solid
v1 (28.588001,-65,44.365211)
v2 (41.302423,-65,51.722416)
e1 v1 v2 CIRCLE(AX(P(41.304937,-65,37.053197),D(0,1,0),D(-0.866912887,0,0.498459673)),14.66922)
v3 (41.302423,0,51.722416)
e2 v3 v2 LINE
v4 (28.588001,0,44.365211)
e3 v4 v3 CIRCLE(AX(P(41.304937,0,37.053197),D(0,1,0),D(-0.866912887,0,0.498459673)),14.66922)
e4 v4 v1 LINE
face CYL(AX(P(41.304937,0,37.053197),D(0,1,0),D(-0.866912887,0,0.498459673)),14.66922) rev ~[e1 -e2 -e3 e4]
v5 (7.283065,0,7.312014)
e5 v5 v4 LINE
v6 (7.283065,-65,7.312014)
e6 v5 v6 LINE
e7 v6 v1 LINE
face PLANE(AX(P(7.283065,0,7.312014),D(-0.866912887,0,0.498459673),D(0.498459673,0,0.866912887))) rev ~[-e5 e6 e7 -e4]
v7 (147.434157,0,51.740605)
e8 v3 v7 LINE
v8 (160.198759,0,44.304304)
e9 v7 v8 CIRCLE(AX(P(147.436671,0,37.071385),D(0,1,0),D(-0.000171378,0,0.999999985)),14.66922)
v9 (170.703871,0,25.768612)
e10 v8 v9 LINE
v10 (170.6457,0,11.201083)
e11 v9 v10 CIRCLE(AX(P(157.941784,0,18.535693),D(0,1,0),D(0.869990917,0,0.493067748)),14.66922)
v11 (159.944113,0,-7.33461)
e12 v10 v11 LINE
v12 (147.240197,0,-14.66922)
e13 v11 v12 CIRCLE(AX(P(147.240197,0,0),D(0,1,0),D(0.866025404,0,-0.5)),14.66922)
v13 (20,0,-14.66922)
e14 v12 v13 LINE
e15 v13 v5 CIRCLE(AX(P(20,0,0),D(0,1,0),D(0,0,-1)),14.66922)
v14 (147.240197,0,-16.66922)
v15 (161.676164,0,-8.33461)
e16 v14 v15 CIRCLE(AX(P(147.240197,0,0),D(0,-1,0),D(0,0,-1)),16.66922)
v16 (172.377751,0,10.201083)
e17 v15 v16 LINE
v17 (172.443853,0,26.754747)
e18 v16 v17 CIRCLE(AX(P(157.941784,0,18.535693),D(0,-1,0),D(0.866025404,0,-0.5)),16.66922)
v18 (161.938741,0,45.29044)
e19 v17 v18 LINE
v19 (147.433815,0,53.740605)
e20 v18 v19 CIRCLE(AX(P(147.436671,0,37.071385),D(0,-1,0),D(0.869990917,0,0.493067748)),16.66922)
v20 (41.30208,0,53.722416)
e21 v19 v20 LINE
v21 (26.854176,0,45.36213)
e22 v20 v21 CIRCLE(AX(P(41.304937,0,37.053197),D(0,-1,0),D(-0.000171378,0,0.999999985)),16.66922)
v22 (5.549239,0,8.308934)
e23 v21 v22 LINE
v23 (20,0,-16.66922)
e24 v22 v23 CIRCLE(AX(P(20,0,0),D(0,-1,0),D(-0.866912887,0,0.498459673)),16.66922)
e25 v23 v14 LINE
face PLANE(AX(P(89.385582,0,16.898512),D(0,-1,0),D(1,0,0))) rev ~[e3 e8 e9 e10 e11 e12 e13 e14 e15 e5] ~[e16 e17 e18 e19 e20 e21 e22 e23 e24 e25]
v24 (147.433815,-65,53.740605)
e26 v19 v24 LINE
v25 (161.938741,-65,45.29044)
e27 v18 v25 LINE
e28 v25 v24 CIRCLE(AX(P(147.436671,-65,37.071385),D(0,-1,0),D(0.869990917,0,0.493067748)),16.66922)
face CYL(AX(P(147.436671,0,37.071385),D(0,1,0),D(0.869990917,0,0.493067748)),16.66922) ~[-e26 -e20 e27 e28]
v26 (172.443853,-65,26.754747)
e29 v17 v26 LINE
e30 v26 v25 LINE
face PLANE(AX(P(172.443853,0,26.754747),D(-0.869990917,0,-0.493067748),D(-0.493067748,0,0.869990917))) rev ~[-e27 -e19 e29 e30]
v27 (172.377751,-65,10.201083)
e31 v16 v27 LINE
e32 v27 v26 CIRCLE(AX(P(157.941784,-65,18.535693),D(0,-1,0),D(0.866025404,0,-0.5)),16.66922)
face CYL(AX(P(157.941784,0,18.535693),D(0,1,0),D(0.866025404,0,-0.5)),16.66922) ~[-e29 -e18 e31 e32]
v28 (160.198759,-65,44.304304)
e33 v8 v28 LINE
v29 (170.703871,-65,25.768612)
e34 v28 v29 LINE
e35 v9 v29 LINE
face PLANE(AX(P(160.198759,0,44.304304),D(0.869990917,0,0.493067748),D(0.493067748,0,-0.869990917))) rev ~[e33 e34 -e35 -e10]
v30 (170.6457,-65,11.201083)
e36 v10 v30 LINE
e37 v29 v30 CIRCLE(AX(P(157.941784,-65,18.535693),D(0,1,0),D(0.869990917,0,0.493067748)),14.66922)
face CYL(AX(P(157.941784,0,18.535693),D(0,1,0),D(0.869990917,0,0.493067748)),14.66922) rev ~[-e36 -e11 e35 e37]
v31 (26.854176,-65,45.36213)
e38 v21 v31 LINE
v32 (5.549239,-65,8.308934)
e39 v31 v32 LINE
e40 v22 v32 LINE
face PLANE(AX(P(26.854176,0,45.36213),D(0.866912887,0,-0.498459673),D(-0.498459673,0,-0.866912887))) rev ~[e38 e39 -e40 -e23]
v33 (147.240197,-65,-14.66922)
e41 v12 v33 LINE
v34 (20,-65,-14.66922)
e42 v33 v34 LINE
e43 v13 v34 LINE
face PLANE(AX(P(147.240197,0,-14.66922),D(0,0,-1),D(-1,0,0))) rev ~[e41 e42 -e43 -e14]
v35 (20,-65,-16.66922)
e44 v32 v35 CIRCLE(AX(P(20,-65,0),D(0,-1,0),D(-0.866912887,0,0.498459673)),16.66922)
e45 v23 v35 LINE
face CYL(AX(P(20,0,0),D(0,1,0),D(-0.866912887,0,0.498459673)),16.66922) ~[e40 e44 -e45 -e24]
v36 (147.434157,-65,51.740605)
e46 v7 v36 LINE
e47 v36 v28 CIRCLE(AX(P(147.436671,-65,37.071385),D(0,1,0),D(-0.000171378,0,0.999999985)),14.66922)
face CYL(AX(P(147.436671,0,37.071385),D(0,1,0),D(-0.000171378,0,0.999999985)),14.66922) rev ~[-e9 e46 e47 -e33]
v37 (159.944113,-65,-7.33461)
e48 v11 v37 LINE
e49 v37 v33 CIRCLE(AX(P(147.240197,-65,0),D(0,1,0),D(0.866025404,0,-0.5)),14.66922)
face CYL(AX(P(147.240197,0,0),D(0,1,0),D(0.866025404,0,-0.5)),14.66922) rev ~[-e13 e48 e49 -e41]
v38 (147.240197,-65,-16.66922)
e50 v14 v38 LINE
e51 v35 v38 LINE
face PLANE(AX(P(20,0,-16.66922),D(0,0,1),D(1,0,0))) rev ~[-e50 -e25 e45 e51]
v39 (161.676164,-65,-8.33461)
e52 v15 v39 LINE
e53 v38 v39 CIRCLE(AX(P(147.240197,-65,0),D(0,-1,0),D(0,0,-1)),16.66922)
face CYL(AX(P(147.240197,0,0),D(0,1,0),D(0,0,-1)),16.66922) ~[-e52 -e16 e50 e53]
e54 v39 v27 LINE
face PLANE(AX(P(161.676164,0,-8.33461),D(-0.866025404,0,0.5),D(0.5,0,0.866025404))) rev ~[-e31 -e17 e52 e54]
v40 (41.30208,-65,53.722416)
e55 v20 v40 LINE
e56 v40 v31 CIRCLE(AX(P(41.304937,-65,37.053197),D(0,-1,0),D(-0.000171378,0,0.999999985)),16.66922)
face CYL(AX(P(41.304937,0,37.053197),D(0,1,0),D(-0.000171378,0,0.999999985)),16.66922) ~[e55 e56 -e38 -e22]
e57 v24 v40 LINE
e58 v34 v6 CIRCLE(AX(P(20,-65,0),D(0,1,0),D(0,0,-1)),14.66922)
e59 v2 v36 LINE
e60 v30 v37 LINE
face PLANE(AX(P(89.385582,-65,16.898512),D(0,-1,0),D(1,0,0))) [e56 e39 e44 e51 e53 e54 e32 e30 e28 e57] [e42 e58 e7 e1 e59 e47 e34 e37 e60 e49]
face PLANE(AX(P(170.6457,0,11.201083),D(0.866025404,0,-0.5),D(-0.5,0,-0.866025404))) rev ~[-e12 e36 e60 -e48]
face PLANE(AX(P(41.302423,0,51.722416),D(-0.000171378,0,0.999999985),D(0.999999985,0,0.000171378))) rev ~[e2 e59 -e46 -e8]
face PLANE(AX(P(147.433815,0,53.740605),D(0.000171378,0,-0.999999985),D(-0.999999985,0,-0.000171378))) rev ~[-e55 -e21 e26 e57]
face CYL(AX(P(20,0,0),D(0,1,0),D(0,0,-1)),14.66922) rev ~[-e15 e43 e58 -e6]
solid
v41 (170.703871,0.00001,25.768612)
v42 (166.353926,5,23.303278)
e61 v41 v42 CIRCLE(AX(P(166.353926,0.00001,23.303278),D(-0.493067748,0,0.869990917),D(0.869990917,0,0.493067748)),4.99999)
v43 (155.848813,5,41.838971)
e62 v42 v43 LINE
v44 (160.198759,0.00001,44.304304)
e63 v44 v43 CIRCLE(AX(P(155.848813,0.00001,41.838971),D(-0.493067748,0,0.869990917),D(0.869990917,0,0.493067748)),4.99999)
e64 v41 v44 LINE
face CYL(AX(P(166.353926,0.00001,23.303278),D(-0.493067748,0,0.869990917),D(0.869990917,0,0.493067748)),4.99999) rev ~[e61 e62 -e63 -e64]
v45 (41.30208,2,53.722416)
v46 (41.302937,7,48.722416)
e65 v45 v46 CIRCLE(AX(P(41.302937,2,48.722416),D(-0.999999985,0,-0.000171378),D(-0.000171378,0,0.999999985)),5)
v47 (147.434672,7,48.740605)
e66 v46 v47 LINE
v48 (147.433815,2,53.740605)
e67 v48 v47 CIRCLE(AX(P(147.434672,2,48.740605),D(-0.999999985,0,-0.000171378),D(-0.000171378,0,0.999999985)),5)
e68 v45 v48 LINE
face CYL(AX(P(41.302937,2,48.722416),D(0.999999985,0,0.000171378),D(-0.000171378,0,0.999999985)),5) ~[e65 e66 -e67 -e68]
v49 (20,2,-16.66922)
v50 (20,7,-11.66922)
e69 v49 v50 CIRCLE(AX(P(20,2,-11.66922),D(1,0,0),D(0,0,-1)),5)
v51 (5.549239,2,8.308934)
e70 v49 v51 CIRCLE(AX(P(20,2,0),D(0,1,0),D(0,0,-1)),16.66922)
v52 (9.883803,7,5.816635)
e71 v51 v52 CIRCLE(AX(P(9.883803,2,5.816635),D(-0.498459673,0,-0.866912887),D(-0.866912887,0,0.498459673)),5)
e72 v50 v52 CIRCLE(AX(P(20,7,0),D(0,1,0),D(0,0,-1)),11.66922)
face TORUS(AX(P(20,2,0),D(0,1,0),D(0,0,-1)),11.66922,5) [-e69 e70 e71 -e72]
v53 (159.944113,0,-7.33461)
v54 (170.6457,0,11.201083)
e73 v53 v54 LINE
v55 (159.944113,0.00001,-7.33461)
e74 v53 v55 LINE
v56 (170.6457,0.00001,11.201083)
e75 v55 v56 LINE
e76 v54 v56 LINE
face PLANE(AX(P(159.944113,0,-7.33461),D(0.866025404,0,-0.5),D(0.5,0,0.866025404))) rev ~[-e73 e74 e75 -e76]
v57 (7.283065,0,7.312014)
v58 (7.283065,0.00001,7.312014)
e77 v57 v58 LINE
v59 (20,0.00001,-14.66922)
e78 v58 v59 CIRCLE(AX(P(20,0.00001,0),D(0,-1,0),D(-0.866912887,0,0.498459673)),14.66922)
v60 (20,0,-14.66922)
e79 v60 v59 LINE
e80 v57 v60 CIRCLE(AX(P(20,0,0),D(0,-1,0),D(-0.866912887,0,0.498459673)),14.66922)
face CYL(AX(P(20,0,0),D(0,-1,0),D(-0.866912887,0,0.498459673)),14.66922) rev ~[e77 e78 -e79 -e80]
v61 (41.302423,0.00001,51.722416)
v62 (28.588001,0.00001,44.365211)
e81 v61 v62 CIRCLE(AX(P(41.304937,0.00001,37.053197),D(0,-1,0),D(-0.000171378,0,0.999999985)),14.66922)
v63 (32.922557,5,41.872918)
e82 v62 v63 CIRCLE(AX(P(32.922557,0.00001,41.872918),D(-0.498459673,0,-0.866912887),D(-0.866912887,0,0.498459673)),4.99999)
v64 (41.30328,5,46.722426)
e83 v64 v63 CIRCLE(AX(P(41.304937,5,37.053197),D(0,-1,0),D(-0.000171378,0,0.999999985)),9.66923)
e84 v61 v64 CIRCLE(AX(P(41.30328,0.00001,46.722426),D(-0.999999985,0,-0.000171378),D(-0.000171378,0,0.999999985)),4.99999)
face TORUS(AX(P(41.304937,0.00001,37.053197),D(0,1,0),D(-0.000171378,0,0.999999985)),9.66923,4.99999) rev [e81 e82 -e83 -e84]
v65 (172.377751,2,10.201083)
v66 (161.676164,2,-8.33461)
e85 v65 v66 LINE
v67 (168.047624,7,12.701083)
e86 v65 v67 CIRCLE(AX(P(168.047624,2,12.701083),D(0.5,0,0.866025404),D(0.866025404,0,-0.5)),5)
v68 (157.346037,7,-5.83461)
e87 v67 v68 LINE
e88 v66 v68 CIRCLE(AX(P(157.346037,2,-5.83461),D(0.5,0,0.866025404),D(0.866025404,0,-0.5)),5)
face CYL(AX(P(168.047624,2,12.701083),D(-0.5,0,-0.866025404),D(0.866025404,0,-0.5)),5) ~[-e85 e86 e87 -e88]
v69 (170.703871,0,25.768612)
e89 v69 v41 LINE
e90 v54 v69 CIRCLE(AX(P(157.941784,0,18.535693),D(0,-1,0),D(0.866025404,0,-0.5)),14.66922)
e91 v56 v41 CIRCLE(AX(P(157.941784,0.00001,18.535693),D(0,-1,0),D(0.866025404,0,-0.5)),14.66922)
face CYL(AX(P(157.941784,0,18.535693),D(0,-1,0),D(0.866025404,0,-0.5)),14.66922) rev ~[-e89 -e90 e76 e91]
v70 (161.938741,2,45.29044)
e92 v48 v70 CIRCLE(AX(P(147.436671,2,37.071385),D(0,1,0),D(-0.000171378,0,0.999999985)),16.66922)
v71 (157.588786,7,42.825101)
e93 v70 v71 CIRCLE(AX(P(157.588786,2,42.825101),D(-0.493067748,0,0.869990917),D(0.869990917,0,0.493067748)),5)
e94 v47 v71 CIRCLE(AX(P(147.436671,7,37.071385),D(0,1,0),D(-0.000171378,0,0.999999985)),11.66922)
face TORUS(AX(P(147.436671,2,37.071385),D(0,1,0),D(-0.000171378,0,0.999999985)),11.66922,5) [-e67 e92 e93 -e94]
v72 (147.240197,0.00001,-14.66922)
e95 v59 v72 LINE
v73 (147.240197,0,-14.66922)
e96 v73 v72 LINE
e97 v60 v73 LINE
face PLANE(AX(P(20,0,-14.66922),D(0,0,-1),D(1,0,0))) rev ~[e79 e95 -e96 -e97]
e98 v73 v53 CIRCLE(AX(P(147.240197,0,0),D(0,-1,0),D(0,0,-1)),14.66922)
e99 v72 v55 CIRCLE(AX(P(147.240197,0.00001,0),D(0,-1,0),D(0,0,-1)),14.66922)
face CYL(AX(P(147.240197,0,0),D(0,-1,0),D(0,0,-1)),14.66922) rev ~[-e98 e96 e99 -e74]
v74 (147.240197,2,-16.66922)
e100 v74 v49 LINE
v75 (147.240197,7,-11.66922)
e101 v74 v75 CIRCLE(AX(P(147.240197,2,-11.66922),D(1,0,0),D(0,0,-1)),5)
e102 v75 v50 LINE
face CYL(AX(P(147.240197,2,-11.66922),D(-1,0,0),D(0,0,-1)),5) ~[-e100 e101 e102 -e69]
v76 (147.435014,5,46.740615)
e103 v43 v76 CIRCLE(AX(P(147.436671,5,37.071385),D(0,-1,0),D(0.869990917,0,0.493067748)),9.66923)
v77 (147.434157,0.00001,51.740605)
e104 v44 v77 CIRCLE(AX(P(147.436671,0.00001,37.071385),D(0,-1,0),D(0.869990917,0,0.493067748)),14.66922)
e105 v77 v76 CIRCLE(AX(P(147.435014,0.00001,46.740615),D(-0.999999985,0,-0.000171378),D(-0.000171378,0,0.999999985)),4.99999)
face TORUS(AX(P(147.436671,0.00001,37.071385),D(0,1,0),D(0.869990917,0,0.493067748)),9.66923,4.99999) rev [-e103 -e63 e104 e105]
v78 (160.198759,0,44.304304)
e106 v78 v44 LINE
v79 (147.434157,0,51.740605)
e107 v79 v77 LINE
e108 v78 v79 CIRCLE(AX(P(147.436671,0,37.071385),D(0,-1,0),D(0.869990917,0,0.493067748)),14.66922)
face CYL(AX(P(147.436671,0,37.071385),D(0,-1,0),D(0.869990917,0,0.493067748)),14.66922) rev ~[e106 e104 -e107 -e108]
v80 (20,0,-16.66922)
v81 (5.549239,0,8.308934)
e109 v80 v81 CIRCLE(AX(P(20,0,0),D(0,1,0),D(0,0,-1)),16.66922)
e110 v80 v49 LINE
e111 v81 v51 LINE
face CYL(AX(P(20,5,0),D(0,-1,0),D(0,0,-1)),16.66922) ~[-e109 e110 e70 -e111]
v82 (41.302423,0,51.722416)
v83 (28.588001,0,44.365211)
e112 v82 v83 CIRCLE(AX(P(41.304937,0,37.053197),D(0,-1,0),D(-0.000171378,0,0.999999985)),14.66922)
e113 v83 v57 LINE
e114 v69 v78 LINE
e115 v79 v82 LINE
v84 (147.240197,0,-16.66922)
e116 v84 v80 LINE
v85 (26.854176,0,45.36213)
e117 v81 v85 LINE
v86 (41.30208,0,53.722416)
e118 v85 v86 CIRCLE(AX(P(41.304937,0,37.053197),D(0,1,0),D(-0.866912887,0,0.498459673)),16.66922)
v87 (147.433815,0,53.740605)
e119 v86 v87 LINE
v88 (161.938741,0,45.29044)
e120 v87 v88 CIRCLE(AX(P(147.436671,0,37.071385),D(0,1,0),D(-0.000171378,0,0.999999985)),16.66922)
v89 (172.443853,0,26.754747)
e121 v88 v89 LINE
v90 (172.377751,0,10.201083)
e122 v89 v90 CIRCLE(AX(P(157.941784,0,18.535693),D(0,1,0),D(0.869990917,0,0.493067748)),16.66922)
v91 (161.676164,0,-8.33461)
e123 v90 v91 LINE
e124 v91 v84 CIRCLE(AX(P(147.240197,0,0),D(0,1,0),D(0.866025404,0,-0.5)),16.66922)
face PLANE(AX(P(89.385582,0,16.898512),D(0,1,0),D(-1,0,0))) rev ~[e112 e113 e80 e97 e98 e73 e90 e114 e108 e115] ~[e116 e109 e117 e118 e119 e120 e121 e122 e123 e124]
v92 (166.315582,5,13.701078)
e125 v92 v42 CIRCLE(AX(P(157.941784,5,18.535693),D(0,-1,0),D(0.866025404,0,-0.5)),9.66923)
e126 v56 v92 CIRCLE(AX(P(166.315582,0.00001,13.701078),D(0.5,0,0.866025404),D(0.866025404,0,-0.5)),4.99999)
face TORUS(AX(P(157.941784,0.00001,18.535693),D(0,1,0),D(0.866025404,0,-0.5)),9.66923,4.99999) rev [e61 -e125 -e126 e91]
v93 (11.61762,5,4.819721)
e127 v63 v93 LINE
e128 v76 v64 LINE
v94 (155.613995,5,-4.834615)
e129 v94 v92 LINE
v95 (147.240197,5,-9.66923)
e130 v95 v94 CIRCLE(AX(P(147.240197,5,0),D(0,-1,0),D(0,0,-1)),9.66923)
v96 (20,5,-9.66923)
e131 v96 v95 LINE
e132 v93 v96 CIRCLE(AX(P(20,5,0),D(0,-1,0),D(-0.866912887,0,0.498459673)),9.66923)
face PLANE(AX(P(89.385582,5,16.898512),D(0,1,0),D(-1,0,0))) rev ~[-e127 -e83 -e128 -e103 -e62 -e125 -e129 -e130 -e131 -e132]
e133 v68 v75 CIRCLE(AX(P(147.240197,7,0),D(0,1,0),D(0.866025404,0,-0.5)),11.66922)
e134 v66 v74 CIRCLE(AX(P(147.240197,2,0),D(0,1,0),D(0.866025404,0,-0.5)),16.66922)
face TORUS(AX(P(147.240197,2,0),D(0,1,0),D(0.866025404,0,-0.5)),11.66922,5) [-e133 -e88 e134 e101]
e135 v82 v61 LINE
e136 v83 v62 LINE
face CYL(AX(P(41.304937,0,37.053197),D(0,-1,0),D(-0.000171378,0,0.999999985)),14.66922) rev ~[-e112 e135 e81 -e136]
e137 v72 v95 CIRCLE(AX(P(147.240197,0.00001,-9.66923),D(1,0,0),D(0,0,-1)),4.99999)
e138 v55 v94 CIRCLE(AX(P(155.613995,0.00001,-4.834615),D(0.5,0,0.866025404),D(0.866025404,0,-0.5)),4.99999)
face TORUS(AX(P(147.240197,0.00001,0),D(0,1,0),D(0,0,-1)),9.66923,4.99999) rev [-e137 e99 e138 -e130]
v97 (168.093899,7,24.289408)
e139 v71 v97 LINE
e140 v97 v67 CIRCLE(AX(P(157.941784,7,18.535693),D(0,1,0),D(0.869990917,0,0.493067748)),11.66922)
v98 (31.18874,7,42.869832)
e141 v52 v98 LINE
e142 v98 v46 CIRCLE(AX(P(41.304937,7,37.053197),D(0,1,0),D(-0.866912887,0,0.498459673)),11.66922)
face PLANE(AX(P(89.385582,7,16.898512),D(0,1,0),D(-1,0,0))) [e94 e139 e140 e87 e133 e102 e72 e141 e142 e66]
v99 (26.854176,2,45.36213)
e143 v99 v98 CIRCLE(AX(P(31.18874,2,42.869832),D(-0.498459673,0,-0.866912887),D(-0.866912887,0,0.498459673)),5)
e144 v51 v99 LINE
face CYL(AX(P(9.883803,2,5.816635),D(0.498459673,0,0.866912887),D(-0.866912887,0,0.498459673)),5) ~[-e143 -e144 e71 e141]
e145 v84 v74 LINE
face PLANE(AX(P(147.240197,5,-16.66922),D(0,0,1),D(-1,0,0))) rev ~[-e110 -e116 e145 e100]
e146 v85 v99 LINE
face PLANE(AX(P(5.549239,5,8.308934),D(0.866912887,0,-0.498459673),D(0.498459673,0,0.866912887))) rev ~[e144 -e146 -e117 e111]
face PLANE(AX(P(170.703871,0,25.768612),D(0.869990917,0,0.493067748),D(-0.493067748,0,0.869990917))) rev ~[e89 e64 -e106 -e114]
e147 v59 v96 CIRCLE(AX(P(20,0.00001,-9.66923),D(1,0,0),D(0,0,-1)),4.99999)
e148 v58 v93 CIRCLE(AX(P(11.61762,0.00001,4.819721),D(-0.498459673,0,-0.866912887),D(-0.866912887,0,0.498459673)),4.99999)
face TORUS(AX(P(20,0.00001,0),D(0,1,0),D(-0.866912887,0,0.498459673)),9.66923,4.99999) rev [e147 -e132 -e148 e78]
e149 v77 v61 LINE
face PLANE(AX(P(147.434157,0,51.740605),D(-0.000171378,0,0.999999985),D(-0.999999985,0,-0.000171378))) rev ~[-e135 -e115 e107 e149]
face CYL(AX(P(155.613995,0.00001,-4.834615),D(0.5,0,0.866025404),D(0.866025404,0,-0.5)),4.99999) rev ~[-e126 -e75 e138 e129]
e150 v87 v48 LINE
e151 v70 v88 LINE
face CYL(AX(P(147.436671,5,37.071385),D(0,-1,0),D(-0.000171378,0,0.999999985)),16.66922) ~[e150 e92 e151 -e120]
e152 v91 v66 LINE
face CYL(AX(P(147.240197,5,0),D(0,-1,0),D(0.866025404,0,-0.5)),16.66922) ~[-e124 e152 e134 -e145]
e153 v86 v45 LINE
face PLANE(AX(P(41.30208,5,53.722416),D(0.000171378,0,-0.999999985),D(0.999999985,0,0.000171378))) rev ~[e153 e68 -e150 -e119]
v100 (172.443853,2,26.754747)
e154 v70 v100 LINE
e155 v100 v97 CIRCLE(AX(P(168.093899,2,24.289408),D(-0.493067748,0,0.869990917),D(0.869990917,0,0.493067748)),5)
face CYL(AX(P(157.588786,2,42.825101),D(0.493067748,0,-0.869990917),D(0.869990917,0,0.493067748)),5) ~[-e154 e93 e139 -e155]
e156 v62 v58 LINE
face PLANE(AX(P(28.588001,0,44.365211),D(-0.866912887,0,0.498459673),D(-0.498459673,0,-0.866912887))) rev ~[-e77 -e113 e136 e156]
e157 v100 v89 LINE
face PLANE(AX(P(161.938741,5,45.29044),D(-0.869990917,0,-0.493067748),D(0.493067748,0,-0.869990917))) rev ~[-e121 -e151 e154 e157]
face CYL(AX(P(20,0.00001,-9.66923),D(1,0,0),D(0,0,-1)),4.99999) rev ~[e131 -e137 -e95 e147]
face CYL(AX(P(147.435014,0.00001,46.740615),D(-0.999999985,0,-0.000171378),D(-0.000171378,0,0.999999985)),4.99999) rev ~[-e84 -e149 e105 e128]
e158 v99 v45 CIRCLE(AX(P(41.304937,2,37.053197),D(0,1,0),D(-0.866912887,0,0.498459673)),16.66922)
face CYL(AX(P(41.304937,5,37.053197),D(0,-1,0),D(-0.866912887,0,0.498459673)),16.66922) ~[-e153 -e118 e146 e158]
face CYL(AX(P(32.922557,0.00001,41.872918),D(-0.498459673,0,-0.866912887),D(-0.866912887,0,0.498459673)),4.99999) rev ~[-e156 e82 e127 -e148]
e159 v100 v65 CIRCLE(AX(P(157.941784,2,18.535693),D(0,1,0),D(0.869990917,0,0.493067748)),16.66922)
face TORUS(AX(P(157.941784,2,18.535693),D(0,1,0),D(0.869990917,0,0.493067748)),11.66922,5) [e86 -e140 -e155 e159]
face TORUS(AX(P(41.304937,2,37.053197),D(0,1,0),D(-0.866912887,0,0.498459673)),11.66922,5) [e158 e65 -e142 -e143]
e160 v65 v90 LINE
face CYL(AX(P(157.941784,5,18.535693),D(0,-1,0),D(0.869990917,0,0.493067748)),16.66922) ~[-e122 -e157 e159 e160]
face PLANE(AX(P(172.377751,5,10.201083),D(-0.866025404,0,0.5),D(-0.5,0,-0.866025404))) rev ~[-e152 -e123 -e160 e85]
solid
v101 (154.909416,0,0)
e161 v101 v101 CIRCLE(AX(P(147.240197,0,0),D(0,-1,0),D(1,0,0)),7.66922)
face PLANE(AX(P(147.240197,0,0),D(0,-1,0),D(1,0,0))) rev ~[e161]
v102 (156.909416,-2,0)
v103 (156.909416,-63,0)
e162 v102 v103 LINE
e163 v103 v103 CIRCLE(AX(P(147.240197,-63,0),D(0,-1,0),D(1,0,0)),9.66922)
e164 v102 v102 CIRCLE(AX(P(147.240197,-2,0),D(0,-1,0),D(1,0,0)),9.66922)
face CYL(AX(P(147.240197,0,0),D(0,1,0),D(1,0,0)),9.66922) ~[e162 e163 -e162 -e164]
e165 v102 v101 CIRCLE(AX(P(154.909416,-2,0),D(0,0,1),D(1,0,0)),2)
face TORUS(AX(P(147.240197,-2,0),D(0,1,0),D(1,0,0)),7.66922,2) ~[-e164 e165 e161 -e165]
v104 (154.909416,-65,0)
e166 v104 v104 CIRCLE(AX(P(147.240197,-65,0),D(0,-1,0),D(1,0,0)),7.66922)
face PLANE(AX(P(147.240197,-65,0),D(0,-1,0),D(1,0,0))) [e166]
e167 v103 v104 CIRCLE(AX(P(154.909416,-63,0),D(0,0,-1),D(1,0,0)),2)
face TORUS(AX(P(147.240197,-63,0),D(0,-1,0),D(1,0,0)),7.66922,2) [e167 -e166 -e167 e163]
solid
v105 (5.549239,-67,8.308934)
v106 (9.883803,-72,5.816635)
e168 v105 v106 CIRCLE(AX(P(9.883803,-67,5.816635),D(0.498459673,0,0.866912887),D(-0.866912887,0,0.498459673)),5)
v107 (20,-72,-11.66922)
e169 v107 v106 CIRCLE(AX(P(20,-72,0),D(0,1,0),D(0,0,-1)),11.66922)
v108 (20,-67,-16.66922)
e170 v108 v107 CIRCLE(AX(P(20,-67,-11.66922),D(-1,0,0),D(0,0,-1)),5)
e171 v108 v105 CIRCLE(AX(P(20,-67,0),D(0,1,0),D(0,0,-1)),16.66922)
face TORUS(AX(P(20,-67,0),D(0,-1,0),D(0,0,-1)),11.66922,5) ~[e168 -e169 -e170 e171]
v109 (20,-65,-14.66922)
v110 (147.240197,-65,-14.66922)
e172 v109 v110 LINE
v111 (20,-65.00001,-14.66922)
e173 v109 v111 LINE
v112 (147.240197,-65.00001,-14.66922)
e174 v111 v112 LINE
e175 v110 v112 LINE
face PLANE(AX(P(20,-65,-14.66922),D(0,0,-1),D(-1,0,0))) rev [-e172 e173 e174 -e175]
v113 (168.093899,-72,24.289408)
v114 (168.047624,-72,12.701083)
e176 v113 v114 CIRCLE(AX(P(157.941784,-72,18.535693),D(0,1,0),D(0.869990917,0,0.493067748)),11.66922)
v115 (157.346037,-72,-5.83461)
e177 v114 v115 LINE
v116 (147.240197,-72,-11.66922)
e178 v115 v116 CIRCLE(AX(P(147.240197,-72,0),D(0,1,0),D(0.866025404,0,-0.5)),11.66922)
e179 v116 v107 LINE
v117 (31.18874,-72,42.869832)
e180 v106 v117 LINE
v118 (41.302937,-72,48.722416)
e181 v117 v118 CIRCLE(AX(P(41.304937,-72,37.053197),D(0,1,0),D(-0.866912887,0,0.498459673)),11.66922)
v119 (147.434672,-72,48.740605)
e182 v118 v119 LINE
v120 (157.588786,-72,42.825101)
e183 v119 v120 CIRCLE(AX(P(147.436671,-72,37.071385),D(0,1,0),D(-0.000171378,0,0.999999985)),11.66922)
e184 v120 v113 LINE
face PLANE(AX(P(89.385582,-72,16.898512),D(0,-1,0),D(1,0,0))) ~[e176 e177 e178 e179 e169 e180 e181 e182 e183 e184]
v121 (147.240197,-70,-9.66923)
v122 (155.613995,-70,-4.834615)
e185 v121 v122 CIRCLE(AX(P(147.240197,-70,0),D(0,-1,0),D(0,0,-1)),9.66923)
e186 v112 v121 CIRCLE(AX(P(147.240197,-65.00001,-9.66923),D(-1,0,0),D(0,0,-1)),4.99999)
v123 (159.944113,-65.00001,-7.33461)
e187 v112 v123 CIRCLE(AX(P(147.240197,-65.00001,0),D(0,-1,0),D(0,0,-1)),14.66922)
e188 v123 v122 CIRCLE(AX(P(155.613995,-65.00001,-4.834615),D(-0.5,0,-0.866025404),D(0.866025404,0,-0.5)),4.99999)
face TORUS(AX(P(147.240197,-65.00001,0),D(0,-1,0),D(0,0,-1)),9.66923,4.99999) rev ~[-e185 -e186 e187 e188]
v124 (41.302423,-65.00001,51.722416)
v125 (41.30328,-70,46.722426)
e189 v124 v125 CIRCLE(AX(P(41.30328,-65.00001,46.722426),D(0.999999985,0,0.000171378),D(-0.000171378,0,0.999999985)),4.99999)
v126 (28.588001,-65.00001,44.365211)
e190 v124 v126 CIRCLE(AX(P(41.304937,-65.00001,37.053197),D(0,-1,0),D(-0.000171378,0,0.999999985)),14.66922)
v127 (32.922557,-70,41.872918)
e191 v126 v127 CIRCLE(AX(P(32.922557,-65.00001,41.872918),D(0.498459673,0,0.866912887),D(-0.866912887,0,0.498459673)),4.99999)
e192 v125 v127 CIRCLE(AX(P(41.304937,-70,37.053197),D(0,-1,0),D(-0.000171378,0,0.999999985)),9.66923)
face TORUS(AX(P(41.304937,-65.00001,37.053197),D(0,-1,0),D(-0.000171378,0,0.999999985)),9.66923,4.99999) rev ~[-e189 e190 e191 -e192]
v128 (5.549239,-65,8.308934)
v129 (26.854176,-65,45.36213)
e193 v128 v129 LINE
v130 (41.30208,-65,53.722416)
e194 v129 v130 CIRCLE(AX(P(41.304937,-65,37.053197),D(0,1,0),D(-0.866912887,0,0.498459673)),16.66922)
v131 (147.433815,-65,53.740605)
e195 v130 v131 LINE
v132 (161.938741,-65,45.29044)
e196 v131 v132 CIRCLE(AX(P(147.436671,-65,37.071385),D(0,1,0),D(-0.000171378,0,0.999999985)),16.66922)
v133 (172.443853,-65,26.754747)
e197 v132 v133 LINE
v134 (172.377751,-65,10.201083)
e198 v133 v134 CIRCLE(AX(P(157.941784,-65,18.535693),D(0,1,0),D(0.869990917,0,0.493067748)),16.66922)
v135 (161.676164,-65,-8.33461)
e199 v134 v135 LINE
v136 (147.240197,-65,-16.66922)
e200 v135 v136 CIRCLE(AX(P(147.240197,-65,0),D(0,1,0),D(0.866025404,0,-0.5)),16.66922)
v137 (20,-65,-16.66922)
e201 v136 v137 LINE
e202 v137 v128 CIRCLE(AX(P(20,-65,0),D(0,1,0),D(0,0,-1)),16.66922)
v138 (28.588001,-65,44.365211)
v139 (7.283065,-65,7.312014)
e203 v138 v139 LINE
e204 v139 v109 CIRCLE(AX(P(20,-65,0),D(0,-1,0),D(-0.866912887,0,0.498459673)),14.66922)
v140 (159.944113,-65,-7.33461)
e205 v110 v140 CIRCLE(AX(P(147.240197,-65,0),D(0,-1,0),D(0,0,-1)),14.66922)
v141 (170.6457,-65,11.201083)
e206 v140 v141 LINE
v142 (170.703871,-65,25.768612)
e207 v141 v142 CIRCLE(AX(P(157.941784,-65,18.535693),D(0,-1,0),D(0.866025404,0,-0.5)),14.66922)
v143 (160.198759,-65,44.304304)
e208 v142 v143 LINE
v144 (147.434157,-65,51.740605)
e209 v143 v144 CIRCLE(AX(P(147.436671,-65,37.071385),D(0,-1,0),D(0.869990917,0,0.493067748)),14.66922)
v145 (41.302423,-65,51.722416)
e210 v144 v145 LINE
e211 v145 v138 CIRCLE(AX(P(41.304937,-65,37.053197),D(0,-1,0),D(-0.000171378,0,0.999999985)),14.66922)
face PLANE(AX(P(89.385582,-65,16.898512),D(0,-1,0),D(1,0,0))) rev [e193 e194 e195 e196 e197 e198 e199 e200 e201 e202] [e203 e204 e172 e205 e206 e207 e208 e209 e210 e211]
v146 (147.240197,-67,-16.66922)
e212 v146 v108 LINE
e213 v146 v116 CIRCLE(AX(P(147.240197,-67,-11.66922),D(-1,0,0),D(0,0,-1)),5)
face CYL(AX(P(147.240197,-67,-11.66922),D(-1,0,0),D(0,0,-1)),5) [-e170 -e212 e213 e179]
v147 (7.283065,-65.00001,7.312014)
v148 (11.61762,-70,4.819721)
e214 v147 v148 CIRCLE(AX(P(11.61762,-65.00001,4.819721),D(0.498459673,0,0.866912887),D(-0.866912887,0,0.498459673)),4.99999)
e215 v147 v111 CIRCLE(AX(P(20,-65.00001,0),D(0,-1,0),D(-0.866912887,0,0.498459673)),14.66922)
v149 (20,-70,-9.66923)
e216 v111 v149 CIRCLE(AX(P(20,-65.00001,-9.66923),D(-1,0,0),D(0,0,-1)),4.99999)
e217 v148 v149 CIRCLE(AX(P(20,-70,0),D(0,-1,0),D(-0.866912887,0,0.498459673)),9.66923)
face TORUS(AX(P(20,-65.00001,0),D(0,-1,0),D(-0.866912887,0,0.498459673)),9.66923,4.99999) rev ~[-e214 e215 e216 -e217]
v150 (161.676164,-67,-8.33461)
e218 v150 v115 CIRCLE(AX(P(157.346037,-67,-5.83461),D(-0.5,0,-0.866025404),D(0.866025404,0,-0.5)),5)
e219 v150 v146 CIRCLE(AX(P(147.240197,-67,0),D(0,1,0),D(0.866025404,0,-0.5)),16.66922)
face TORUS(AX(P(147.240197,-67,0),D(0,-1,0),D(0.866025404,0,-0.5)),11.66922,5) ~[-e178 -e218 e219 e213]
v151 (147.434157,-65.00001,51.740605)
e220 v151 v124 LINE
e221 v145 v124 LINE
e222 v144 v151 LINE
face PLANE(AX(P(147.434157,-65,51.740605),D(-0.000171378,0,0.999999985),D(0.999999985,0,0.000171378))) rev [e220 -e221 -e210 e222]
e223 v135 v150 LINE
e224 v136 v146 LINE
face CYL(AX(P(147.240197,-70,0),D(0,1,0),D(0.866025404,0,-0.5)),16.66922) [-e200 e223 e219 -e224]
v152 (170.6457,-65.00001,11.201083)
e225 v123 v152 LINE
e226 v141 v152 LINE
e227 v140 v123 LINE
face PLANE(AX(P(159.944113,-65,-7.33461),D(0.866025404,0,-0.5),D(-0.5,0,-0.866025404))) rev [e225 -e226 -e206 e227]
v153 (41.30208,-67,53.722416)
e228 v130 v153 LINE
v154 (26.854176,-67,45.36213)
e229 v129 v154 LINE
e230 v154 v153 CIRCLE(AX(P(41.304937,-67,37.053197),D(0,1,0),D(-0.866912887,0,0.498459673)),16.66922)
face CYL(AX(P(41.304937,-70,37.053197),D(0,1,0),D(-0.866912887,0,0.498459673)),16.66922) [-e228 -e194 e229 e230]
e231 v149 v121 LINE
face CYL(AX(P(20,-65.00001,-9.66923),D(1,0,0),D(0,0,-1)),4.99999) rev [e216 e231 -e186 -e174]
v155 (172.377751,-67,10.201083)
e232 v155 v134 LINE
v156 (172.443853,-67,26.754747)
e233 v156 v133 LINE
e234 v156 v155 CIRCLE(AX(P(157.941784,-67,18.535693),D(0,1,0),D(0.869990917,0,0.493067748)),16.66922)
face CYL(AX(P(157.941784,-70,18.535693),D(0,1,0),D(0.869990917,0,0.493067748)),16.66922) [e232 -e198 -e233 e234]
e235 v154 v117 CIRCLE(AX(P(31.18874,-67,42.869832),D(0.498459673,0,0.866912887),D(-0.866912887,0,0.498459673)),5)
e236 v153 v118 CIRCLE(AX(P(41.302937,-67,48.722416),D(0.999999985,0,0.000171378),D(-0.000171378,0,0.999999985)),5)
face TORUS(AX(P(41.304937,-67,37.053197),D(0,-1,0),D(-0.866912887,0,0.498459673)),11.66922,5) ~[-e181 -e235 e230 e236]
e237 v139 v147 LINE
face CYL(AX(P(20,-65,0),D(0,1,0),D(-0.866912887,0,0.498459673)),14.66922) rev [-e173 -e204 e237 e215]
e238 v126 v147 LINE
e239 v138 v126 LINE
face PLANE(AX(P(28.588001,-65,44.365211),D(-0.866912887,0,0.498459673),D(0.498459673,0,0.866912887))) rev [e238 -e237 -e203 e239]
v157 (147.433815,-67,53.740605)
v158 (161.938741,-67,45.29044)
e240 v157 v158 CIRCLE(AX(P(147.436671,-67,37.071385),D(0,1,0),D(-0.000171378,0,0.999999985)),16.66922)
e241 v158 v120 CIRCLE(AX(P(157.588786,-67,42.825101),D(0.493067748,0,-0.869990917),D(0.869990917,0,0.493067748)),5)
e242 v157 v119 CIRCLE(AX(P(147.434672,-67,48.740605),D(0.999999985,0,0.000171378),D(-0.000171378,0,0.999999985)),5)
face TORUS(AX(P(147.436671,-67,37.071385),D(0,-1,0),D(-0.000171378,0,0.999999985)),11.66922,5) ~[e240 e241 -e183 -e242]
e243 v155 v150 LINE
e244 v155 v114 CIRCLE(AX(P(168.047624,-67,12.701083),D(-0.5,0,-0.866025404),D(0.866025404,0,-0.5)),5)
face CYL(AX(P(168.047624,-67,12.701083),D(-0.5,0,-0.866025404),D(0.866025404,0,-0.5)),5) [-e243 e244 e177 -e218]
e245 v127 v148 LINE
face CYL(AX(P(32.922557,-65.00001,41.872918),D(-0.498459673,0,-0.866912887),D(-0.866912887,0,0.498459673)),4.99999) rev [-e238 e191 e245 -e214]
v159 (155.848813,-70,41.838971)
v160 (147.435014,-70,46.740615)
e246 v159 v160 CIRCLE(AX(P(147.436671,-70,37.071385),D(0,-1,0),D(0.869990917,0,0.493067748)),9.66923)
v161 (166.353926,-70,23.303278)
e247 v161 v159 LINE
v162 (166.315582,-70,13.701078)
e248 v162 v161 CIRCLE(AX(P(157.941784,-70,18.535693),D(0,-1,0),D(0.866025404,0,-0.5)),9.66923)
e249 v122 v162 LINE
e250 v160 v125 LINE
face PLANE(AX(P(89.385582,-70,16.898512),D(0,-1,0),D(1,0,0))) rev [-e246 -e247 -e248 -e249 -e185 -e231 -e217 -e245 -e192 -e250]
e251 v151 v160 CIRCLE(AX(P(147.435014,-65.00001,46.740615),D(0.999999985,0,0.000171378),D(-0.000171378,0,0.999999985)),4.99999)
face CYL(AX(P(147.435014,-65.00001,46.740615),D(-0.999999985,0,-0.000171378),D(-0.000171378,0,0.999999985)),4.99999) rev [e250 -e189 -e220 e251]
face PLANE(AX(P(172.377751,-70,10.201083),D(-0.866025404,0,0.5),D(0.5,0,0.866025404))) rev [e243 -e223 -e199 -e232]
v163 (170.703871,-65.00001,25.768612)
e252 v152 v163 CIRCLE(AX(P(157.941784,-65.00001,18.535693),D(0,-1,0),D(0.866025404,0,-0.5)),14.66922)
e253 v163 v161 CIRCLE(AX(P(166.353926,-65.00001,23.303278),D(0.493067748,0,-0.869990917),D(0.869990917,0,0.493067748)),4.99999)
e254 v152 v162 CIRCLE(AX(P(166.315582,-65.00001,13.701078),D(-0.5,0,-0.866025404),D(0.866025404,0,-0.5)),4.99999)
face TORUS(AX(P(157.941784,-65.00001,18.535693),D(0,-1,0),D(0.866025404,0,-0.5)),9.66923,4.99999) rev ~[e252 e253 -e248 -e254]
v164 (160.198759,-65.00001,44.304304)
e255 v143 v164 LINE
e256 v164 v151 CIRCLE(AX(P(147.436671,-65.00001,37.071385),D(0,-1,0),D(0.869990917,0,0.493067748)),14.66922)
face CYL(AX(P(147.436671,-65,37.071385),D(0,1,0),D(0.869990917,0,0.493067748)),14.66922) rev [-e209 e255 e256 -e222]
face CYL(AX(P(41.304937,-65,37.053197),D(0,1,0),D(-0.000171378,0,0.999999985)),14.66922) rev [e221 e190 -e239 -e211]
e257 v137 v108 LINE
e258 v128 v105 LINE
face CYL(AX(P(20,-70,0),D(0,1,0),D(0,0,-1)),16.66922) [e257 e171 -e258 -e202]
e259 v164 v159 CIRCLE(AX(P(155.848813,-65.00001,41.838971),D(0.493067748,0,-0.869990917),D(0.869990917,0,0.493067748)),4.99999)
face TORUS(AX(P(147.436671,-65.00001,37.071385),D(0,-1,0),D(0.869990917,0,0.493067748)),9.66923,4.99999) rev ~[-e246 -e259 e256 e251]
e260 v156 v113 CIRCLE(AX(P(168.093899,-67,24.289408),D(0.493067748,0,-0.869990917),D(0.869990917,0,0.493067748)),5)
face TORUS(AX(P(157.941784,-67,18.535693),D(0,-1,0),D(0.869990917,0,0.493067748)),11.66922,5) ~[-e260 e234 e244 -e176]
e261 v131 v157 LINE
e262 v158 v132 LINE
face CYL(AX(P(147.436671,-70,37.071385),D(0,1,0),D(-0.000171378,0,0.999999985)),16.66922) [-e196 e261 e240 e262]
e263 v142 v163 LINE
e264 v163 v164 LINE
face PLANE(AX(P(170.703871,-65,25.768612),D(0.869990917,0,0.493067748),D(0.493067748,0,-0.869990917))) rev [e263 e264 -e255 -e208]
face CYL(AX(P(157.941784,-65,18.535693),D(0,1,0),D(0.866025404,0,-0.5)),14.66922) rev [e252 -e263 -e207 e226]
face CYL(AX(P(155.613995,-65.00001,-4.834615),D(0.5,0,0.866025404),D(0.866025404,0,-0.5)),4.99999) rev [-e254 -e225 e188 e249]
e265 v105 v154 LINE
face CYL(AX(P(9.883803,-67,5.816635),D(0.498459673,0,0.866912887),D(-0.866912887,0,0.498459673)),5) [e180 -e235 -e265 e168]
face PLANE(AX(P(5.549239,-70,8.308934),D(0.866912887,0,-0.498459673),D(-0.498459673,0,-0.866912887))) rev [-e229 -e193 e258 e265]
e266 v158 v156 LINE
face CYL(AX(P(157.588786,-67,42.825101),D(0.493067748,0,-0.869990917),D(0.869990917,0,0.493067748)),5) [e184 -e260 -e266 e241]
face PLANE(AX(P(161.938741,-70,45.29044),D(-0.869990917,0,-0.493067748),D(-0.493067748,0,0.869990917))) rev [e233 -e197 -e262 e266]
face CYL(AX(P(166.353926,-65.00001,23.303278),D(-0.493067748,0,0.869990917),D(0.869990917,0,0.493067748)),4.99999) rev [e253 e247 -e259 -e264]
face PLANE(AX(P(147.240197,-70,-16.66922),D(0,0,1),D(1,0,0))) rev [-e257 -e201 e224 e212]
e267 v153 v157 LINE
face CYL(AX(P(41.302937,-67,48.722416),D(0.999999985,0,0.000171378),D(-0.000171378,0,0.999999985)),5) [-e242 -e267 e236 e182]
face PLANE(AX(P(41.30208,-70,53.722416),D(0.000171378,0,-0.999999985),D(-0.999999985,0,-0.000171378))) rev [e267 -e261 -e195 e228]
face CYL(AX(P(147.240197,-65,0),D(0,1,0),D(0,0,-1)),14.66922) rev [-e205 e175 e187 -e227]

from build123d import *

# Parameters (mm, degrees)
F2_DEPTH = 65
F0_R     = 9.6692195179
F3_DEPTH = 65
F4_R     = 2
F6_DEPTH = 5
F8_DEPTH = 2
F9_R     = 5
F10_R    = 4.99999


# Not quite as in the source:
# - a fillet or chamfer is up to 0.001 mm smaller than in the source, because OpenCascade refuses the exact size


with BuildPart() as f2:
    # F1 (on Front) → F2 (new body)
    with BuildSketch(Plane.XZ):
        with BuildLine():
            Line((147.4338146996, 53.7406046613), (41.3020801363, 53.7224159943))
            ThreePointArc((41.3020801363, 53.7224159943), (32.9562626309, 51.4810350091), (26.8541756584, 45.3621304392))
            Line((26.8541756584, 45.3621304392), (5.5492387811, 8.308933718))
            ThreePointArc((5.5492387811, 8.308933718), (5.5714463746, -8.3474379072), (20, -16.6692195179))
            Line((20, -16.6692195179), (147.2401965291, -16.6692195179))
            ThreePointArc((147.2401965291, -16.6692195179), (155.574806288, -14.4359675638), (161.6761640928, -8.3346097589))
            Line((161.6761640928, -8.3346097589), (172.3777512594, 10.2010829351))
            ThreePointArc((172.3777512594, 10.2010829351), (174.6108703147, 18.4691297742), (172.4438532753, 26.7547472165))
            Line((172.4438532753, 26.7547472165), (161.9387410203, 45.2904399106))
            ThreePointArc((161.9387410203, 45.2904399106), (155.8276257555, 51.4746754645), (147.4338146996, 53.7406046613))
        make_face()
        with BuildLine():
            ThreePointArc((28.5880014327, 44.3652110923), (33.9579501109, 49.7499595653), (41.3024228927, 51.7224160237))
            Line((41.3024228927, 51.7224160237), (147.4341574561, 51.7406046906))
            ThreePointArc((147.4341574561, 51.7406046906), (154.8208654442, 49.7465453549), (160.1987591856, 44.3043044153))
            Line((160.1987591856, 44.3043044153), (170.7038714406, 25.7686117212))
            ThreePointArc((170.7038714406, 25.7686117212), (172.6108862601, 18.4771161013), (170.6457004518, 11.2010829351))
            Line((170.6457004518, 11.2010829351), (159.9441132852, -7.3346097589))
            ThreePointArc((159.9441132852, -7.3346097589), (154.574806288, -12.7039167562), (147.2401965291, -14.6692195179))
            Line((147.2401965291, -14.6692195179), (20, -14.6692195179))
            ThreePointArc((20, -14.6692195179), (7.3026076458, -7.3458987652), (7.2830645554, 7.3120143711))
            Line((7.2830645554, 7.3120143711), (28.5880014327, 44.3652110923))
        make_face(mode=Mode.SUBTRACT)
    extrude(amount=F2_DEPTH)


with BuildPart() as f3:
    # F0 (on Front) → F3 (new body)
    with BuildSketch(Plane.XZ):
        with Locations((147.2401965291, 0)):
            Circle(F0_R)
    extrude(amount=F3_DEPTH)

    # F4
    f4_edges = [f3.edges().sort_by_distance(p)[0] for p in [
        (137.570977, -65, 0),
        (137.570977, 0, 0),
    ]]
    fillet(f4_edges, radius=F4_R)


with BuildPart() as f6:
    # F5 (on face) → F6 (new body)
    with BuildSketch(Plane(origin=(0, 0, 0), x_dir=(-1, 0, 0), z_dir=(0, 1, 0))):
        with BuildLine():
            Line((-172.3777512594, 10.2010829351), (-161.6761640928, -8.3346097589))
            ThreePointArc((-161.6761640928, -8.3346097589), (-155.574806288, -14.4359675638), (-147.2401965291, -16.6692195179))
            Line((-147.2401965291, -16.6692195179), (-20, -16.6692195179))
            ThreePointArc((-20, -16.6692195179), (-5.5714463746, -8.3474379072), (-5.5492387811, 8.308933718))
            Line((-5.5492387811, 8.308933718), (-26.8541756584, 45.3621304392))
            ThreePointArc((-26.8541756584, 45.3621304392), (-32.9562626309, 51.4810350091), (-41.3020801363, 53.7224159943))
            Line((-41.3020801363, 53.7224159943), (-147.4338146996, 53.7406046613))
            ThreePointArc((-147.4338146996, 53.7406046613), (-155.8276257555, 51.4746754645), (-161.9387410203, 45.2904399106))
            Line((-161.9387410203, 45.2904399106), (-172.4438532753, 26.7547472165))
            ThreePointArc((-172.4438532753, 26.7547472165), (-174.6108703147, 18.4691297742), (-172.3777512594, 10.2010829351))
        make_face()
        with BuildLine():
            ThreePointArc((-7.2830645554, 7.3120143711), (-7.3026076458, -7.3458987652), (-20, -14.6692195179))
            Line((-20, -14.6692195179), (-147.2401965291, -14.6692195179))
            ThreePointArc((-147.2401965291, -14.6692195179), (-154.574806288, -12.7039167562), (-159.9441132852, -7.3346097589))
            Line((-159.9441132852, -7.3346097589), (-170.6457004518, 11.2010829351))
            ThreePointArc((-170.6457004518, 11.2010829351), (-172.6108862601, 18.4771161013), (-170.7038714406, 25.7686117212))
            Line((-170.7038714406, 25.7686117212), (-160.1987591856, 44.3043044153))
            ThreePointArc((-160.1987591856, 44.3043044153), (-154.8208654442, 49.7465453549), (-147.4341574561, 51.7406046906))
            Line((-147.4341574561, 51.7406046906), (-41.3024228927, 51.7224160237))
            ThreePointArc((-41.3024228927, 51.7224160237), (-33.9579501109, 49.7499595653), (-28.5880014327, 44.3652110923))
            Line((-28.5880014327, 44.3652110923), (-7.2830645554, 7.3120143711))
        make_face(mode=Mode.SUBTRACT)
    extrude(amount=F6_DEPTH)

    # F7 (on face) → F8 (join)
    with BuildSketch(Plane(origin=(0, 5, 0), x_dir=(-1, 0, 0), z_dir=(0, 1, 0))):
        with BuildLine():
            Line((-172.3777512594, 10.2010829351), (-161.6761640928, -8.3346097589))
            ThreePointArc((-161.6761640928, -8.3346097589), (-155.574806288, -14.4359675638), (-147.2401965291, -16.6692195179))
            Line((-147.2401965291, -16.6692195179), (-20, -16.6692195179))
            ThreePointArc((-20, -16.6692195179), (-5.5714463746, -8.3474379072), (-5.5492387811, 8.308933718))
            Line((-5.5492387811, 8.308933718), (-26.8541756584, 45.3621304392))
            ThreePointArc((-26.8541756584, 45.3621304392), (-32.9562626309, 51.4810350091), (-41.3020801363, 53.7224159943))
            Line((-41.3020801363, 53.7224159943), (-147.4338146996, 53.7406046613))
            ThreePointArc((-147.4338146996, 53.7406046613), (-155.8276257555, 51.4746754645), (-161.9387410203, 45.2904399106))
            Line((-161.9387410203, 45.2904399106), (-172.4438532753, 26.7547472165))
            ThreePointArc((-172.4438532753, 26.7547472165), (-174.6108703147, 18.4691297742), (-172.3777512594, 10.2010829351))
        make_face()
    extrude(amount=F8_DEPTH)

    # F9
    f9_edges = [f6.edges().sort_by_distance(p)[0] for p in [
        (167.191297, 7, 36.022594),
        (174.61087, 7, 18.46913),
        (167.026958, 7, 0.933237),
        (155.574806, 7, -14.435968),
        (83.620098, 7, -16.66922),
        (5.571446, 7, -8.347438),
        (16.201707, 7, 26.835532),
        (32.956263, 7, 51.481035),
        (94.367947, 7, 53.73151),
        (155.827626, 7, 51.474675),
    ]]
    fillet(f9_edges, radius=F9_R)

    # F10 (radius 5 in the source; OpenCascade refuses exactly that, so slightly less here)
    f10_edges = [f6.edges().sort_by_distance(p)[0] for p in [
        (33.95795, 5, 49.74996),
        (17.935533, 5, 25.838613),
        (7.302608, 5, -7.345899),
        (83.620098, 5, -14.66922),
        (154.574806, 5, -12.703917),
        (165.294907, 5, 1.933237),
        (172.610886, 5, 18.477116),
        (165.451315, 5, 35.036458),
        (154.820865, 5, 49.746545),
        (94.36829, 5, 51.73151),
    ]]
    fillet(f10_edges, radius=F10_R)


with BuildPart() as f12_1:
    # F12: instance of F6
    add(f6.part.mirror(Plane.XZ.offset(32.5)))


solid = Compound([f2.part, f3.part, f6.part, f12_1.part])
